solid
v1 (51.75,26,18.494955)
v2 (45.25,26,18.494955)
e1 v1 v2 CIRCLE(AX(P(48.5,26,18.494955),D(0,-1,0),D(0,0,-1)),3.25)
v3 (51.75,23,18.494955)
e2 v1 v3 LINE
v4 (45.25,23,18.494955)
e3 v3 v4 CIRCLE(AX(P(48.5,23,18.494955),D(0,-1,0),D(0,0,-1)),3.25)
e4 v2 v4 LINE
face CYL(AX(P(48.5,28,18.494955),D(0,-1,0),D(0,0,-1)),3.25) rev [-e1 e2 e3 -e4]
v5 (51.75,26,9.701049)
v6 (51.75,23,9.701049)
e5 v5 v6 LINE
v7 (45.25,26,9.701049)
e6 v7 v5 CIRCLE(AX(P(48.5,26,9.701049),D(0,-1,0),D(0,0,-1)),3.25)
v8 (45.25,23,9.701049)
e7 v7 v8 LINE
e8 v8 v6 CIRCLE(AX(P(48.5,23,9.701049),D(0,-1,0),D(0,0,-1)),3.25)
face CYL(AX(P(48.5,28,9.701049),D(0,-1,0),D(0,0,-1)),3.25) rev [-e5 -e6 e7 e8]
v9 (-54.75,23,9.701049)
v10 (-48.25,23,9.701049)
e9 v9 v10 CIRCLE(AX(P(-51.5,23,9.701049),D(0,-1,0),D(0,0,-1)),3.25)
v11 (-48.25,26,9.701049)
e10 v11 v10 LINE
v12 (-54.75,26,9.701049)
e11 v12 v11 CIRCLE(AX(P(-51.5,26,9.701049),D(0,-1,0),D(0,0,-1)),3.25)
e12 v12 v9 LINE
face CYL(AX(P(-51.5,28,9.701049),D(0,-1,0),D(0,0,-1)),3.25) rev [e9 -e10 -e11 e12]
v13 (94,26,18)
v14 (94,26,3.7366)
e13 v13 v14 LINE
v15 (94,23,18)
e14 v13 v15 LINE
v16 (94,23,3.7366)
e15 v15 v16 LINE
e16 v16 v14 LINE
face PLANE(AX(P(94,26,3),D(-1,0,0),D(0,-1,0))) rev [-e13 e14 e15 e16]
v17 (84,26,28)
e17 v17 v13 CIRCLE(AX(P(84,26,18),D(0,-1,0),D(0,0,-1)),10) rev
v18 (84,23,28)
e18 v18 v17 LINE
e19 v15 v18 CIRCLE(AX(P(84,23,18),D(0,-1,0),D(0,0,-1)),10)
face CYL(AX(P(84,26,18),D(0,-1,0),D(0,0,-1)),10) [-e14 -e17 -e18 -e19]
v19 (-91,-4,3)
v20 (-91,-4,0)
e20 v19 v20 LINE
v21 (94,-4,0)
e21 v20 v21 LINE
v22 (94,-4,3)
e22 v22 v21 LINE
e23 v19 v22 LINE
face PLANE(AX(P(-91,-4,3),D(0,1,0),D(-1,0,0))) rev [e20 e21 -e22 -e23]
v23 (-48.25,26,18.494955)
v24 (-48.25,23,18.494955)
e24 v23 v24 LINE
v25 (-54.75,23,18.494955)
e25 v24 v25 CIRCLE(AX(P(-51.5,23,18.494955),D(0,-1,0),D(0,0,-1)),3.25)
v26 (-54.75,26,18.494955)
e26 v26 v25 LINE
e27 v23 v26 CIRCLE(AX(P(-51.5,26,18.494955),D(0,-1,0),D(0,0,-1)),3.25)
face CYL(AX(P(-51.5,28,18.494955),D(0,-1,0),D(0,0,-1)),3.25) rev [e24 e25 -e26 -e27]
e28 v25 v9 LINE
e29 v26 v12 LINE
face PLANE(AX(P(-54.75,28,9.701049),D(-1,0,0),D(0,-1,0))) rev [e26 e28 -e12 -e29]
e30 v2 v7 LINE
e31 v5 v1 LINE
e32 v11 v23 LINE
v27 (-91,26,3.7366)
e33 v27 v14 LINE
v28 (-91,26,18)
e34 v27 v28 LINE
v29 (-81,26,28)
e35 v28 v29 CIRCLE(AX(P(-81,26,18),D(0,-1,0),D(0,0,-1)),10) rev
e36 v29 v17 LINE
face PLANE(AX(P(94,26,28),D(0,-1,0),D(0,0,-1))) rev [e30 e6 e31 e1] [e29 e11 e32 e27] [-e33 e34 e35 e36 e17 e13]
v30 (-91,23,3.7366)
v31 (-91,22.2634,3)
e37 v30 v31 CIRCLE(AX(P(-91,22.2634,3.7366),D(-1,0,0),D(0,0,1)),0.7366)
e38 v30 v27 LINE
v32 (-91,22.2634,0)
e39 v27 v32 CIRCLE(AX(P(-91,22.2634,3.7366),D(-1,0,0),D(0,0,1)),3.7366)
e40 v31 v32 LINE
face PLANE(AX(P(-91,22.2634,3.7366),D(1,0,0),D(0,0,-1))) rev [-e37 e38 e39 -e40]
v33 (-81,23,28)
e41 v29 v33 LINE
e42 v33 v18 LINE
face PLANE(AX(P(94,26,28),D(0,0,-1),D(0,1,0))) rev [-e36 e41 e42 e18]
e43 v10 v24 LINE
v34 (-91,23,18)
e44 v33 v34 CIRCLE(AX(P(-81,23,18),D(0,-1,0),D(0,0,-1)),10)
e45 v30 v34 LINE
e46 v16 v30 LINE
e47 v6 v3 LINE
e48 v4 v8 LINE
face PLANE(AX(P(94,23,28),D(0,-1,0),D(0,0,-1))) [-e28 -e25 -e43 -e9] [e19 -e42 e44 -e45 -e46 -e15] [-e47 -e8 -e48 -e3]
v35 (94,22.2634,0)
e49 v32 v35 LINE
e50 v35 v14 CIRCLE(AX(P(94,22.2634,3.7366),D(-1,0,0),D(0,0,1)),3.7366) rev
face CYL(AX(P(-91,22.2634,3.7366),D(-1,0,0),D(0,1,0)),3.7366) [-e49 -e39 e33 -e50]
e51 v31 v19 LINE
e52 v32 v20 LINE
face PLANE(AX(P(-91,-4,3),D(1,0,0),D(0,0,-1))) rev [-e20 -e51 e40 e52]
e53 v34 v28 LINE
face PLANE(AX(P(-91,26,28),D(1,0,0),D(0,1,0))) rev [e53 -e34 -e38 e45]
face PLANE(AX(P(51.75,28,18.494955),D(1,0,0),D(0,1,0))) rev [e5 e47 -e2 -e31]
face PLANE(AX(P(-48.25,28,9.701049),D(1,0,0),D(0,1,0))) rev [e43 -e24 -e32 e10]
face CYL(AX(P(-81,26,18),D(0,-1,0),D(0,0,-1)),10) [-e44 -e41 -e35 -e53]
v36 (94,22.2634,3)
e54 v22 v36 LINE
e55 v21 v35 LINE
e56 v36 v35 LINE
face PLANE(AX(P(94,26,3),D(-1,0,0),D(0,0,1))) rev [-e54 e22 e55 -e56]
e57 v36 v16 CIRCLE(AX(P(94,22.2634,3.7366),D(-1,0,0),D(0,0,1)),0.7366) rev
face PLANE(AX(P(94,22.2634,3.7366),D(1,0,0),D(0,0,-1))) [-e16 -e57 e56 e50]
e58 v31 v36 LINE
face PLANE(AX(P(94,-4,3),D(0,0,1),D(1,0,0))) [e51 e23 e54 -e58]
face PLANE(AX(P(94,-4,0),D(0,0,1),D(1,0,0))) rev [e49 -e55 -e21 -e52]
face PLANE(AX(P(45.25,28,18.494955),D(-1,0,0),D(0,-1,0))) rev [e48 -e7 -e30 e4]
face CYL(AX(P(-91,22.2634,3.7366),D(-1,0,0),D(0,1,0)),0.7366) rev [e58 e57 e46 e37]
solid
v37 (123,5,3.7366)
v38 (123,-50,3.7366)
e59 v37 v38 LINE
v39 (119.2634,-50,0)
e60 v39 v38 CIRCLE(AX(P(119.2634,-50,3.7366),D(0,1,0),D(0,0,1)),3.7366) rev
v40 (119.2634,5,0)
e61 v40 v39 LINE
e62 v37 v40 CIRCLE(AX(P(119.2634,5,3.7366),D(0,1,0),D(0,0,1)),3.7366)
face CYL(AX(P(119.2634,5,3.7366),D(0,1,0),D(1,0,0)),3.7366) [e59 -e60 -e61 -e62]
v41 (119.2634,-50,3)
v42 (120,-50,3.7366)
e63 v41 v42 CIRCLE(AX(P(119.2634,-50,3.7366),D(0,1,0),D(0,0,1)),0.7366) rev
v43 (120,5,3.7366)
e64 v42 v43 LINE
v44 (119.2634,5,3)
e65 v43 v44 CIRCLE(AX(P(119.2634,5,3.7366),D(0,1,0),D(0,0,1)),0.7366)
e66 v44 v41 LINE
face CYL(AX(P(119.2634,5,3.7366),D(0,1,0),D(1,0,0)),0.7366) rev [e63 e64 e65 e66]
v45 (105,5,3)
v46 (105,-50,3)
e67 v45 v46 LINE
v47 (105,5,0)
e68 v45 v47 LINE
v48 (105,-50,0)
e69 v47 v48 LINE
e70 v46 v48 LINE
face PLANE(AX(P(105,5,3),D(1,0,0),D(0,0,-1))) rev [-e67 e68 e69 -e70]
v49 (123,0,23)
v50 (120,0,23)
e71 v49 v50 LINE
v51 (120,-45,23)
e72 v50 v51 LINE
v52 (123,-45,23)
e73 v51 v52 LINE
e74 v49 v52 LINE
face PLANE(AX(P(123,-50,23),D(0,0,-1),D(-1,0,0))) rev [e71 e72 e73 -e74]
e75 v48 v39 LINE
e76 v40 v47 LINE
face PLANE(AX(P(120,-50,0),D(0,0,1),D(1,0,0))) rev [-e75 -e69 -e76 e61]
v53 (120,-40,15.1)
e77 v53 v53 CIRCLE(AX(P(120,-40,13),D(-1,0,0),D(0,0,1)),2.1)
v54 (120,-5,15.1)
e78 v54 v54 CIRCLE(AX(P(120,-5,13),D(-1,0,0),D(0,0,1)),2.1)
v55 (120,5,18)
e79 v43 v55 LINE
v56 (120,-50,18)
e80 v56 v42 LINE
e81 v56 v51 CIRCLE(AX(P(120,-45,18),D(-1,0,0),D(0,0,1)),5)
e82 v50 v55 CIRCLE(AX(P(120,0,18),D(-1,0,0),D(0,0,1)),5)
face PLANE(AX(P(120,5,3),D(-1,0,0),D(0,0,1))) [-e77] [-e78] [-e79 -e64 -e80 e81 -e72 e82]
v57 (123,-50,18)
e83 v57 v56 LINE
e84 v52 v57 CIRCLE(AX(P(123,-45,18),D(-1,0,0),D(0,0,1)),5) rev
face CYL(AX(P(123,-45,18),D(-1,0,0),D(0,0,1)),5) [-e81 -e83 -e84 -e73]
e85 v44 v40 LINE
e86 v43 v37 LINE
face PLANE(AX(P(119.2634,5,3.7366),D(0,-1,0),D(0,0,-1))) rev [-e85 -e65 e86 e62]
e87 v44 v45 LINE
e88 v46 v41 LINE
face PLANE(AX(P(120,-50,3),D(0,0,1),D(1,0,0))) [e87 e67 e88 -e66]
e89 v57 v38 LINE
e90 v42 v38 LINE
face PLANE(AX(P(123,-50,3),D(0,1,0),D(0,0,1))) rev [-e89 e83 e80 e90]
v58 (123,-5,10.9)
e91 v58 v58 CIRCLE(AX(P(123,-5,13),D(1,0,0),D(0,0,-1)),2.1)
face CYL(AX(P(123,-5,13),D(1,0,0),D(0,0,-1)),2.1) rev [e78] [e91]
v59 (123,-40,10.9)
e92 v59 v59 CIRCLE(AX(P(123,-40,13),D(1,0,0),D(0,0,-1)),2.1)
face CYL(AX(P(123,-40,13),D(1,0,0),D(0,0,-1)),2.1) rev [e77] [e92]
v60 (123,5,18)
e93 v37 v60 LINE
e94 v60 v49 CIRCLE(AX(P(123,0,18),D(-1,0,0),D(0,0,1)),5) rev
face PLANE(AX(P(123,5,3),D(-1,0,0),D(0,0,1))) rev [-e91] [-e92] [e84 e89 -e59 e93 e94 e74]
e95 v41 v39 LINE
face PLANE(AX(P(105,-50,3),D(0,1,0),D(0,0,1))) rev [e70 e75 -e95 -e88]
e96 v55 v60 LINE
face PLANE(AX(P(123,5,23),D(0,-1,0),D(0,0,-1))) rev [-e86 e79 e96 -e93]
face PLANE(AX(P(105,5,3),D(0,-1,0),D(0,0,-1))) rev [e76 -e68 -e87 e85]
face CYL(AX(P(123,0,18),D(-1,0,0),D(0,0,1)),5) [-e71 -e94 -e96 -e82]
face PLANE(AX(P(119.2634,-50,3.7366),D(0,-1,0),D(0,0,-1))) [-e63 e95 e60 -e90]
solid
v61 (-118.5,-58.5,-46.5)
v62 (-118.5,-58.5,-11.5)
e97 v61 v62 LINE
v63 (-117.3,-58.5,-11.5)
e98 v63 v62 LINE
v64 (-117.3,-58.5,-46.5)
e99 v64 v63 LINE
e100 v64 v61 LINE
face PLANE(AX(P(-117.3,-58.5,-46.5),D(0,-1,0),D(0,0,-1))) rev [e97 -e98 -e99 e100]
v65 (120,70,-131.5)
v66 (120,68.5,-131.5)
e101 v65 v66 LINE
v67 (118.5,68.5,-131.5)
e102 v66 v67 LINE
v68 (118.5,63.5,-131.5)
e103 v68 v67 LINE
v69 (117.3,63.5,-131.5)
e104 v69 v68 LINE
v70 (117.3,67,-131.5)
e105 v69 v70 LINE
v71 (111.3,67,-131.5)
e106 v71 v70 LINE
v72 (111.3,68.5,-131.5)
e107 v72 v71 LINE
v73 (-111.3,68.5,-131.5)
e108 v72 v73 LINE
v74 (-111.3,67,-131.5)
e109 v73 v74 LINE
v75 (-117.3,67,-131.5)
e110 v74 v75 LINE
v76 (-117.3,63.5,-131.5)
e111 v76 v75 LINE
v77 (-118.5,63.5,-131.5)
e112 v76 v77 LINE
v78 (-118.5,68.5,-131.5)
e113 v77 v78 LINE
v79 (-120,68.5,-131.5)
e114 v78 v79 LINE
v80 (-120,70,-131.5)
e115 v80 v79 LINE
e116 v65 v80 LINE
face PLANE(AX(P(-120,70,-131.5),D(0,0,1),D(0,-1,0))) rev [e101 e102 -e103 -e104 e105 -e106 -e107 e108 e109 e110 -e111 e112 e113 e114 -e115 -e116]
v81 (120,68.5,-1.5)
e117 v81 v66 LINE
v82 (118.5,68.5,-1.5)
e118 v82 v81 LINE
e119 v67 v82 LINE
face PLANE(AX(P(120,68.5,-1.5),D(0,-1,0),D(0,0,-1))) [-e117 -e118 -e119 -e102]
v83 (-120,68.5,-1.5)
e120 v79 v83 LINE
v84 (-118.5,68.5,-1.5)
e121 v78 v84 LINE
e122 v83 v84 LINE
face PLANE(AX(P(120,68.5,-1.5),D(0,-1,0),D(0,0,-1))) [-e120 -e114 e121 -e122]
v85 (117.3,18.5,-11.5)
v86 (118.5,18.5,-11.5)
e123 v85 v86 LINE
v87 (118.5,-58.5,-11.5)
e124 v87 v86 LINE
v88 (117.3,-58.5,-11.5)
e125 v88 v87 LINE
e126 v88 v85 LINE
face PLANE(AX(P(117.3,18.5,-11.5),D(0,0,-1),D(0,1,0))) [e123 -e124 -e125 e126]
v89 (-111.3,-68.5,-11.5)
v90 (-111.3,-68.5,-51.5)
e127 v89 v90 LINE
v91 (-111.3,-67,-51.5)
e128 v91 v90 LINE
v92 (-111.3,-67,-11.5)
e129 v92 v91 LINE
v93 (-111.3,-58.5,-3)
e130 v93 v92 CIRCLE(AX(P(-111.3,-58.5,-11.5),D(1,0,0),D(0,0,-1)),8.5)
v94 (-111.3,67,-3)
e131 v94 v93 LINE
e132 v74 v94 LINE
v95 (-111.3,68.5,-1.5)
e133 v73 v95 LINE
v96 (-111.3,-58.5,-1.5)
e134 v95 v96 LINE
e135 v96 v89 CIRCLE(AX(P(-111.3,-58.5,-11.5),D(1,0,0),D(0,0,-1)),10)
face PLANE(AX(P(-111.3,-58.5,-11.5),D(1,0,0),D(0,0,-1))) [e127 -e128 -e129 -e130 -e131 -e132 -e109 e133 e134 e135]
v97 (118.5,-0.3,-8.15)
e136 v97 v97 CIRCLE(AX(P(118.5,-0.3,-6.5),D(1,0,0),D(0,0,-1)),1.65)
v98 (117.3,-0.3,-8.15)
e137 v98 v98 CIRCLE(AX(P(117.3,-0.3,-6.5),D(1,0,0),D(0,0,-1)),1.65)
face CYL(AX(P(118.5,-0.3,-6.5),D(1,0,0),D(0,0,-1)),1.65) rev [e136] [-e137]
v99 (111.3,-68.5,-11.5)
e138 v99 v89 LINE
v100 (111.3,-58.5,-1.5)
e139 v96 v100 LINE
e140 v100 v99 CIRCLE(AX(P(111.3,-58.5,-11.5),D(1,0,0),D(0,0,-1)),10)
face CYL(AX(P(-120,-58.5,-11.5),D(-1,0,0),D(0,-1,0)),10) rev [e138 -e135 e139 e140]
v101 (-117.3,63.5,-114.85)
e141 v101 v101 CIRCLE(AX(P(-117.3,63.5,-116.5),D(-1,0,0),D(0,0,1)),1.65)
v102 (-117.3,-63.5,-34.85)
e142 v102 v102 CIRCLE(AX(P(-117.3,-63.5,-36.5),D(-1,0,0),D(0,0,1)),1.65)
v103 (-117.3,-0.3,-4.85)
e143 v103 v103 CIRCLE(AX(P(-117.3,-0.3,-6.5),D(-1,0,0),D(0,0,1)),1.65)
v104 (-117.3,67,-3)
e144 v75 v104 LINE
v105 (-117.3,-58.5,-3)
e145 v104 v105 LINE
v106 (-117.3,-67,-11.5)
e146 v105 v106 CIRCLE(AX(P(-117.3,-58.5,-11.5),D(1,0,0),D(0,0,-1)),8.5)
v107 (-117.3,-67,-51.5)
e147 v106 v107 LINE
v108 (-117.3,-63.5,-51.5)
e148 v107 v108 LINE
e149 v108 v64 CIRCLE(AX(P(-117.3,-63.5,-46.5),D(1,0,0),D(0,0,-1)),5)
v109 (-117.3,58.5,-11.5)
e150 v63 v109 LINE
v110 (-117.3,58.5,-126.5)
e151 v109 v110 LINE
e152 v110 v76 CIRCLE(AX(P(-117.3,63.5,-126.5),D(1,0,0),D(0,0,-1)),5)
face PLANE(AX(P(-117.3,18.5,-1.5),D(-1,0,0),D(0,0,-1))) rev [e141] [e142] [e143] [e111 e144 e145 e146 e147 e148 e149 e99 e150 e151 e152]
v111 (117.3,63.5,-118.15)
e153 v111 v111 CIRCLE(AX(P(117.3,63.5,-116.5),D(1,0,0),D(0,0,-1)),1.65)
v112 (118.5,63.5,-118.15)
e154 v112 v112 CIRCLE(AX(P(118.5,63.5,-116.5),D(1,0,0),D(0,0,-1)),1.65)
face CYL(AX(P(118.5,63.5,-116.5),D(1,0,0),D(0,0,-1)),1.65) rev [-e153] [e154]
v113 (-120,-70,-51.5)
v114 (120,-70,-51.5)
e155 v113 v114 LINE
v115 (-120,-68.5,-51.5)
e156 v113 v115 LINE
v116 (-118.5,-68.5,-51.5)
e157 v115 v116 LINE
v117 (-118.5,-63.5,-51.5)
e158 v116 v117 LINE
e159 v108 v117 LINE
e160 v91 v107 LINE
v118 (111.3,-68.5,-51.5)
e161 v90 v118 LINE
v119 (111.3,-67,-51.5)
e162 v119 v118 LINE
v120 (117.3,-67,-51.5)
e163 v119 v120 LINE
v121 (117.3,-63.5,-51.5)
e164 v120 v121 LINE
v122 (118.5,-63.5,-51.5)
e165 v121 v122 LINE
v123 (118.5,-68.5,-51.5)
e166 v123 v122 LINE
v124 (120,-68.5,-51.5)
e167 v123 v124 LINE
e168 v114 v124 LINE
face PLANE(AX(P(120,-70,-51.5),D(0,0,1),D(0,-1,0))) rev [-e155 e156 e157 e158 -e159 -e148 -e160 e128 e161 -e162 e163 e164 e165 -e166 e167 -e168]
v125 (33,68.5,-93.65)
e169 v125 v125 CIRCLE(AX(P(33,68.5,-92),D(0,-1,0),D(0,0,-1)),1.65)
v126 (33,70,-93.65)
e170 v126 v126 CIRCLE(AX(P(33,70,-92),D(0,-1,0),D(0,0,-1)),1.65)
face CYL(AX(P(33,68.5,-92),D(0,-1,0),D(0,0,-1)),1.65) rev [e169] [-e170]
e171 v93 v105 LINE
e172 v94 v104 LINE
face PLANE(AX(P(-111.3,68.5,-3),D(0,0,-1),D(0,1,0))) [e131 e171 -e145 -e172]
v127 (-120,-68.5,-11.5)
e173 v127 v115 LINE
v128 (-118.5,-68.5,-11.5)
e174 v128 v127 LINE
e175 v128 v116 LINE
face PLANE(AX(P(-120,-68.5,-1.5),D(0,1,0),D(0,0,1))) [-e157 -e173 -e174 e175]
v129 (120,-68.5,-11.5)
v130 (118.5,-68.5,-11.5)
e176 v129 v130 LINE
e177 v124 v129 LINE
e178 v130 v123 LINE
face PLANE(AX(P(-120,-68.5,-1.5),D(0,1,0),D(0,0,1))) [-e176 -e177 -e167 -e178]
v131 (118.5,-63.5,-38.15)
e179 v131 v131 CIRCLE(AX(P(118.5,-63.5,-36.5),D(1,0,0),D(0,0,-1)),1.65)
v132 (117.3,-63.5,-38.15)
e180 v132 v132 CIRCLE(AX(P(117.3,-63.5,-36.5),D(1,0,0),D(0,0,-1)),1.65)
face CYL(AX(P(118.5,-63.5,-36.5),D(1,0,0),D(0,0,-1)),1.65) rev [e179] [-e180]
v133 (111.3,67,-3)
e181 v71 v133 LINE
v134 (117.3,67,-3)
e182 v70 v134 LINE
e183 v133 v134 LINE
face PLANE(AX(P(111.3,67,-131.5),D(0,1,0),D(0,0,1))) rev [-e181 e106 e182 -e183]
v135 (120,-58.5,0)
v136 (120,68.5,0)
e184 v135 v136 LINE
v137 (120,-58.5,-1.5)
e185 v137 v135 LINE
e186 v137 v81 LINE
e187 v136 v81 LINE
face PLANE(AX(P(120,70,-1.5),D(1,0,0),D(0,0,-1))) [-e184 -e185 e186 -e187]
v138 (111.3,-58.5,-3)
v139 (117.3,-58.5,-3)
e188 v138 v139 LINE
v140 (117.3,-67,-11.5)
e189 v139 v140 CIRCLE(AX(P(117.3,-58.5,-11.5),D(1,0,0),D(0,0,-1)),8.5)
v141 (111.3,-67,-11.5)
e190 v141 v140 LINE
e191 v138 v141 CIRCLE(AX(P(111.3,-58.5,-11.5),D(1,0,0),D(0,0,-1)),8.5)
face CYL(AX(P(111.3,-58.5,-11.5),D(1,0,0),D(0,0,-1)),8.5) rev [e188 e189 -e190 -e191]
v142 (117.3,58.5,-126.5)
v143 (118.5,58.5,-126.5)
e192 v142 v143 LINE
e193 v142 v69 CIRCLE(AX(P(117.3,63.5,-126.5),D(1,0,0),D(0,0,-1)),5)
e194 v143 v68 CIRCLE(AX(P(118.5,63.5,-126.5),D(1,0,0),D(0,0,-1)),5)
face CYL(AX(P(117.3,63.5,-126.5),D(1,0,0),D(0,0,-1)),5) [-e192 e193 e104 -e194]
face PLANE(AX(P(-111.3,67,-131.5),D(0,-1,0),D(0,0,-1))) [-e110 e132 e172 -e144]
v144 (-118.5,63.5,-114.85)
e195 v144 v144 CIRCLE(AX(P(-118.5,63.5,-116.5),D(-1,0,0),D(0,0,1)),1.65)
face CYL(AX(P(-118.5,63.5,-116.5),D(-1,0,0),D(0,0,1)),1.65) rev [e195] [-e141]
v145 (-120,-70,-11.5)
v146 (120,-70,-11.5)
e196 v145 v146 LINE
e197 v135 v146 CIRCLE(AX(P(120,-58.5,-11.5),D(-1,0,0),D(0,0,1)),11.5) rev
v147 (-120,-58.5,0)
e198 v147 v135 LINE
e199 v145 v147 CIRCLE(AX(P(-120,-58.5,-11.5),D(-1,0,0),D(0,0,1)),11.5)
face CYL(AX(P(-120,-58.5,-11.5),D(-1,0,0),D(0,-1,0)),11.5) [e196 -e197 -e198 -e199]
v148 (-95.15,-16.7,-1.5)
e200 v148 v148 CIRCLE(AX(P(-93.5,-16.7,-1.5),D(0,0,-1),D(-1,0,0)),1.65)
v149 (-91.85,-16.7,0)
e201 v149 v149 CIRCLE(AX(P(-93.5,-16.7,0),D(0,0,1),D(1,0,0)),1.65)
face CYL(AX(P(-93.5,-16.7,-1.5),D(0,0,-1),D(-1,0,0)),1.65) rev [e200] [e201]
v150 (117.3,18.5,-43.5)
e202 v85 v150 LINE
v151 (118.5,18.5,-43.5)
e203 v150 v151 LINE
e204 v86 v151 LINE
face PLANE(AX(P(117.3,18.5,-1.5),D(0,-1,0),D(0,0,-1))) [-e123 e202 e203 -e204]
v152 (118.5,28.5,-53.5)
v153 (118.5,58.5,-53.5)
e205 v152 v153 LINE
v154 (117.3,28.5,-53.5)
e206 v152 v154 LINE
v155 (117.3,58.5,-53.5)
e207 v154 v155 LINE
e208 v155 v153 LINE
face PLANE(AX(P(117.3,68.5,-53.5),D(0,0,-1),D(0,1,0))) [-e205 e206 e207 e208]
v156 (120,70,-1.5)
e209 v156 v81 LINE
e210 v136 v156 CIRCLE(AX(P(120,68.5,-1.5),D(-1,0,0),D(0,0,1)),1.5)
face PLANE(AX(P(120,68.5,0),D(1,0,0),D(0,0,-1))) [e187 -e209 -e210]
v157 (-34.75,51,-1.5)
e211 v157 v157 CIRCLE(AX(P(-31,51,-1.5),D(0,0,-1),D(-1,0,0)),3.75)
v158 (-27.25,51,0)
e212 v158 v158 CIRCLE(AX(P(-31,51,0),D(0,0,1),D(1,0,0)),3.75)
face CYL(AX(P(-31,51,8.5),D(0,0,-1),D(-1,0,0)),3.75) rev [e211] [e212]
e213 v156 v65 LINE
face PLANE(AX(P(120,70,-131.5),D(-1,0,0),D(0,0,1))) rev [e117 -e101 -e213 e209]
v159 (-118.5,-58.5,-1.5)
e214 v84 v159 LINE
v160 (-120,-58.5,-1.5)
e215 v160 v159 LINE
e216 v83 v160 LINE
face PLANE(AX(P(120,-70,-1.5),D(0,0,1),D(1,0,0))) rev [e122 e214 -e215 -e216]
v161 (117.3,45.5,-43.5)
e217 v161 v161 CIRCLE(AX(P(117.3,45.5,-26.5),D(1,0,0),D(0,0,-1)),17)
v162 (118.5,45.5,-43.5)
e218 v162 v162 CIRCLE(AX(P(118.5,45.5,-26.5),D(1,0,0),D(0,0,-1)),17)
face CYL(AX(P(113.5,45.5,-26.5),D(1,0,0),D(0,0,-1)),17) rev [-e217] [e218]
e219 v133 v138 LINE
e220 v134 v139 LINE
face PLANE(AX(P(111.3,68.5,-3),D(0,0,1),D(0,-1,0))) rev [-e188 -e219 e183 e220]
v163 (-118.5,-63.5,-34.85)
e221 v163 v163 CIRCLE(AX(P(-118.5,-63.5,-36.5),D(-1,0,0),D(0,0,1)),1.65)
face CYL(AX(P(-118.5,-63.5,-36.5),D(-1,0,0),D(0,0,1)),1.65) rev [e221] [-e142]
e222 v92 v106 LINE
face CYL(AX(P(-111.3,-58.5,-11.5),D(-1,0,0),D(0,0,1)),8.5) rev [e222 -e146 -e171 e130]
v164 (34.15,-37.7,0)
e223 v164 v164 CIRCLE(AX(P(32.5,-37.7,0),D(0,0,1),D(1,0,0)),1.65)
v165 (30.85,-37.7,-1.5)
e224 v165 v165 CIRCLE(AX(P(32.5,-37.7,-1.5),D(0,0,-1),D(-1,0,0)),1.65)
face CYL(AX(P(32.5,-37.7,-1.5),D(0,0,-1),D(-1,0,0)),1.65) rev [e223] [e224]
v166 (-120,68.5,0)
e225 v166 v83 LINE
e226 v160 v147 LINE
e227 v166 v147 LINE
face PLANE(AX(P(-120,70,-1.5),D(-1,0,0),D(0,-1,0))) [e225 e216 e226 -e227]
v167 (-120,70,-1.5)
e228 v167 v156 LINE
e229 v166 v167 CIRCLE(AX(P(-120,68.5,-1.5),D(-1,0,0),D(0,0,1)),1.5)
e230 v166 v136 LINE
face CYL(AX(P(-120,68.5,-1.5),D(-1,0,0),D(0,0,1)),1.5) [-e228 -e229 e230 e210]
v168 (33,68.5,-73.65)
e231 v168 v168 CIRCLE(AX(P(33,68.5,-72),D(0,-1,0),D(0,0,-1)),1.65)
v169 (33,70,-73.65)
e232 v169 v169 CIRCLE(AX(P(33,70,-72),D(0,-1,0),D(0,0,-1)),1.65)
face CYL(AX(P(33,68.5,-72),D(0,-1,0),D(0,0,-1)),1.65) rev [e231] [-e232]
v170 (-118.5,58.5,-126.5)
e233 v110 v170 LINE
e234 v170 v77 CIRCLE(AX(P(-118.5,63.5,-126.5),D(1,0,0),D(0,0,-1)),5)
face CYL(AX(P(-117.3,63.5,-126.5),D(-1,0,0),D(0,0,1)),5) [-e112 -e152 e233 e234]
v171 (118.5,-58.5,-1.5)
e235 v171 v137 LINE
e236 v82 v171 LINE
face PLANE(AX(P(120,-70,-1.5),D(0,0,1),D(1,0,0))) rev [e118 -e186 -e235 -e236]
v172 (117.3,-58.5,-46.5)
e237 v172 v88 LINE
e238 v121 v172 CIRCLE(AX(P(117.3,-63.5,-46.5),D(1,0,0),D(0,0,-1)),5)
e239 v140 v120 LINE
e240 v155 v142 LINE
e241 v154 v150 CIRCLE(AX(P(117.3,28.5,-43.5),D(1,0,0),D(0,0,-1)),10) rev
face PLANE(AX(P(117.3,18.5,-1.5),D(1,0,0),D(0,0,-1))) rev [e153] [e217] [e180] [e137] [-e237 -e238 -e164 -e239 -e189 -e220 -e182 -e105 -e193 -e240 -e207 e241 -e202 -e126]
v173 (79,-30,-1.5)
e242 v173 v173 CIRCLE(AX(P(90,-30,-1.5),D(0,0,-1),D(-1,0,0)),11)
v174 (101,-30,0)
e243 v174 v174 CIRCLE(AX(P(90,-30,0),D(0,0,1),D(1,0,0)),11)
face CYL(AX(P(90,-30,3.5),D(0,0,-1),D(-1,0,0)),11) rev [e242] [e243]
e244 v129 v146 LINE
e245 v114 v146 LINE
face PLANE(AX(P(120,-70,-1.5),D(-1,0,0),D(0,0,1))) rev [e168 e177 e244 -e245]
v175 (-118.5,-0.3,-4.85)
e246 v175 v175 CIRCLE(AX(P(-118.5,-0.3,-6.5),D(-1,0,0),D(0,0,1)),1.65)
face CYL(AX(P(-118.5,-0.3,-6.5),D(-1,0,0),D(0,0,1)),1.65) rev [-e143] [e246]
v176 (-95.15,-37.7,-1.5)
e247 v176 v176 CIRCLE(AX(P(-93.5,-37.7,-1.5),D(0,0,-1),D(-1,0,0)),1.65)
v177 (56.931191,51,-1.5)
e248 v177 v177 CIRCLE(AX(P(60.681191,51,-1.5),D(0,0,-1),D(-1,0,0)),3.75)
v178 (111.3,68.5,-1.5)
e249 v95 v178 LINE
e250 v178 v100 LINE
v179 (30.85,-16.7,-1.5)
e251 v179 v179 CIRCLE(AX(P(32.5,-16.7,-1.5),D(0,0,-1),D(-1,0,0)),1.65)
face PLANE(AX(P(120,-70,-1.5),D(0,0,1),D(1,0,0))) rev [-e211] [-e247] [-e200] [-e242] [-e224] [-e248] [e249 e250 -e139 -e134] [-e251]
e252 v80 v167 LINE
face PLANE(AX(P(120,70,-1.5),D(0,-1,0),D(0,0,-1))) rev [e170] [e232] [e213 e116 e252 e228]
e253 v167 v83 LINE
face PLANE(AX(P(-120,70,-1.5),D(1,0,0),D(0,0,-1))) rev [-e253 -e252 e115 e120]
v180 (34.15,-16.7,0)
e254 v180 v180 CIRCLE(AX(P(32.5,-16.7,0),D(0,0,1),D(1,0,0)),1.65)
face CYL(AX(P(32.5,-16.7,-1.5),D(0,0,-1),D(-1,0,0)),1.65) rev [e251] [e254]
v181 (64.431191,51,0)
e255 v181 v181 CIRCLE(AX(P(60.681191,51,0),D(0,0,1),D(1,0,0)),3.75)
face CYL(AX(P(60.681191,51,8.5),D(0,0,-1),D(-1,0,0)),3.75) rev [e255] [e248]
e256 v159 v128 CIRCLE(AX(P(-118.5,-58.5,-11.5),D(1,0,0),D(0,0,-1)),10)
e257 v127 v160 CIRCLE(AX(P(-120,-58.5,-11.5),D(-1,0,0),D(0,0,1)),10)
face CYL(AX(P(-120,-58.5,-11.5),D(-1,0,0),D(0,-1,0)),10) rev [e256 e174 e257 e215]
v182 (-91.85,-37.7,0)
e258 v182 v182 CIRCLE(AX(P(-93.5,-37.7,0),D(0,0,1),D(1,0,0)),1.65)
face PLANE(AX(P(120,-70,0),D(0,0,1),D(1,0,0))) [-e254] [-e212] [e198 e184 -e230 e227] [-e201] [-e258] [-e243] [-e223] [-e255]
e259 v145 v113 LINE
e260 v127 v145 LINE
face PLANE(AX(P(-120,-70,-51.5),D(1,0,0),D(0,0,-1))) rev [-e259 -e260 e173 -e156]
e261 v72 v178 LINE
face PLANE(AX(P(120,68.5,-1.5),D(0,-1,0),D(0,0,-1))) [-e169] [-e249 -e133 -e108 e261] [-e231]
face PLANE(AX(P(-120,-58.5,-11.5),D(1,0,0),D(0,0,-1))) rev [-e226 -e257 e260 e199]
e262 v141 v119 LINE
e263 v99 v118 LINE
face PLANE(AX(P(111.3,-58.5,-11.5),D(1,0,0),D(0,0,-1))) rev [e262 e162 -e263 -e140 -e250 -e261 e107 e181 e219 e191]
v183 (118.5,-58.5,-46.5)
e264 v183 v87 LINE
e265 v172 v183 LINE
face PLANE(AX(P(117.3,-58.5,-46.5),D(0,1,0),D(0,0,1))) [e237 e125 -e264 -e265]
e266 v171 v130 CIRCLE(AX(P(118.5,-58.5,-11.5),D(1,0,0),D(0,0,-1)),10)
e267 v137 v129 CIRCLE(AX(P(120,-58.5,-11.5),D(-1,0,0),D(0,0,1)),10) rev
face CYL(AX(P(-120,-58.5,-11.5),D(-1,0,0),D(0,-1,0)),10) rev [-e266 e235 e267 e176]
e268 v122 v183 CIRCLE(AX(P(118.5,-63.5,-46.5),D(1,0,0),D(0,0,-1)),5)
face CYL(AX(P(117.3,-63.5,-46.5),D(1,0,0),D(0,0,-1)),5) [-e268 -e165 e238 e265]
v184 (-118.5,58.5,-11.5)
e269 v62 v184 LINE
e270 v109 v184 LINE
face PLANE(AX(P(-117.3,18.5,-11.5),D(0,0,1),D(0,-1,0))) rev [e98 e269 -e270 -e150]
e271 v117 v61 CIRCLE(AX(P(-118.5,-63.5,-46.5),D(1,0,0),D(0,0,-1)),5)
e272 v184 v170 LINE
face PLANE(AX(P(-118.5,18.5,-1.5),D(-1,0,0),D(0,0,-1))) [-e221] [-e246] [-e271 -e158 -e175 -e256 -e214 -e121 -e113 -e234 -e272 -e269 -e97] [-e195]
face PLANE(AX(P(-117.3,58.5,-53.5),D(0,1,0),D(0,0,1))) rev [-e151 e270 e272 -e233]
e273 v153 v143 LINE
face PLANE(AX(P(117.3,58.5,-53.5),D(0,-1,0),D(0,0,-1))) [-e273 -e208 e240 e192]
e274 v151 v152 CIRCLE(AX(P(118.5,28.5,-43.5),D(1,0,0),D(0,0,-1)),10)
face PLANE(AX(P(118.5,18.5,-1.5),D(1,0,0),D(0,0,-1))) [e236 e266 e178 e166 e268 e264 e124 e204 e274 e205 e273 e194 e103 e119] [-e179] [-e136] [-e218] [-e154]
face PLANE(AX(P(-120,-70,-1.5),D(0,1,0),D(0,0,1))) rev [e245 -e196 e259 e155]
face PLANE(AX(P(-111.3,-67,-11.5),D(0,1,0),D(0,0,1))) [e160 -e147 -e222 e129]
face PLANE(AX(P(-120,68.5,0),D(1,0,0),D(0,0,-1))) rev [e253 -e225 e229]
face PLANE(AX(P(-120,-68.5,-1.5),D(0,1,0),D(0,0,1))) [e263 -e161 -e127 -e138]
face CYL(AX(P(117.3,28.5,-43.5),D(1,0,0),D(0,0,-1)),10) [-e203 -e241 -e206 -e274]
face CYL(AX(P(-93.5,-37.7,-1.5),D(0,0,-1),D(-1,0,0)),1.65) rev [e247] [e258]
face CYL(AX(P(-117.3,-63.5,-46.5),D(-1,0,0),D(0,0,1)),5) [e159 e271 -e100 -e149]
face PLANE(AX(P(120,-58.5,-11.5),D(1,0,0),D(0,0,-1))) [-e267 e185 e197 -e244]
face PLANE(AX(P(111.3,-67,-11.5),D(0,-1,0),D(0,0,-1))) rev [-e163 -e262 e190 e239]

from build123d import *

# Parameters (mm, degrees)
SKETCH_1_W                       = 240
SKETCH_1_H                       = 140
SM_BASE_FLANGE_1_DEPTH           = 1.5
SM_START                         = -120
SM_EDGE_FLANGE_1_DEPTH           = 240
SM_EDGE_FLANGE_1_2_OUTLINE_W     = 1.5
SM_EDGE_FLANGE_1_2_OUTLINE_H     = 130
SM_EDGE_FLANGE_1_2_DEPTH         = 240
SM_EDGE_FLANGE_2_STRIP_W         = 26
SM_EDGE_FLANGE_2_STRIP_H         = 1.5
SM_EDGE_FLANGE_2_STRIP_CUT_DEPTH = 240
SM_EDGE_FLANGE_2_DEPTH           = 240
EXTRUDE_START                    = -1.5
SKETCH_10_W                      = 52
SKETCH_10_H                      = 50
EXTRUDE_1_DEPTH                  = 1.2
SKETCH_11_R                      = 17
CUT_EXTRUDE_7_DEPTH              = 5
SKETCH_12_R                      = 11
CUT_EXTRUDE_8_DEPTH              = 5
EXTRUDE_2_DEPTH                  = 1.2
EXTRUDE_3_DEPTH                  = 1.2
SKETCH_16_W                      = 42
SKETCH_16_H                      = 40
CUT_EXTRUDE_9_DEPTH              = 1.2
HOLE_WIZARD_M4_1_AT_2_COUNT      = 2
HOLE_WIZARD_M4_1_AT_2_PITCH      = 127.163044946
HOLE_WIZARD_M4_1_AT_3_COUNT      = 2
HOLE_WIZARD_M4_1_AT_3_PITCH      = 150.096635539
SKETCH_19_W                      = 185
SKETCH_19_H                      = 30
SM_BASE_FLANGE_1_2_DEPTH         = 3
SM_EDGE_FLANGE_3_STRIP_W         = 13.4732
SM_EDGE_FLANGE_3_STRIP_H         = 3
SM_EDGE_FLANGE_3_STRIP_CUT_DEPTH = 185
SM_EDGE_FLANGE_3_DEPTH           = 185
FILLET_1_R                       = 10
CUT_EXTRUDE_10_DEPTH             = 5
SKETCH_25_R                      = 3.75
CUT_EXTRUDE_11_DEPTH             = 10
EXTRUDE_1_2_DEPTH                = 6
HOLE_WIZARD_M4_2_AT_2_COUNT      = 2
HOLE_WIZARD_M4_2_AT_2_PITCH      = 21
HOLE_WIZARD_M4_2_AT_3_COUNT      = 2
HOLE_WIZARD_M4_2_AT_3_PITCH      = 126
HOLE_WIZARD_M4_2_AT_4_COUNT      = 2
HOLE_WIZARD_M4_2_AT_4_PITCH      = 127.738013136
SKETCH_29_W                      = 15
SKETCH_29_H                      = 55
SM_BASE_FLANGE_2_DEPTH           = 3
SM_EDGE_FLANGE_4_STRIP_W         = 13.4732
SM_EDGE_FLANGE_4_STRIP_H         = 3
SM_EDGE_FLANGE_4_STRIP_CUT_DEPTH = 55
SM_EDGE_FLANGE_4_DEPTH           = 55
HOLE_WIZARD_M5_1_AT_2_COUNT      = 2
HOLE_WIZARD_M5_1_AT_2_PITCH      = 35
FILLET_2_R                       = 5
FILLET_3_R                       = 10
HOLE_WIZARD_M4_3_AT_2_COUNT      = 2
HOLE_WIZARD_M4_3_AT_2_PITCH      = 20


# Read off the part's stored shape, not the designer's step: 边线-法兰1, 拉伸-薄壁1
# Sheet-metal steps are written as plain solids
with BuildPart() as part:
    # Sketch 1 → Sm Base Flange 1 (new body)
    with BuildSketch(Plane.XY):
        Rectangle(SKETCH_1_W, SKETCH_1_H)
    extrude(amount=-SM_BASE_FLANGE_1_DEPTH)

    # 边线-法兰1 outline → 边线-法兰1 (cut)
    with BuildSketch(Plane.YZ.offset(SM_START)):
        with BuildLine():
            Line((70, 0), (68.5, 0))
            ThreePointArc((68.5, 0), (69.560660172, -0.439339828), (70, -1.5))
            Line((70, -1.5), (70, 0))
        make_face()
    extrude(amount=SM_EDGE_FLANGE_1_DEPTH, mode=Mode.SUBTRACT)

    # Sm Edge Flange 1 2 outline → Sm Edge Flange 1 2 (add)
    with BuildSketch(Plane.YZ.offset(SM_START)):
        with Locations((69.25, -66.5)):
            Rectangle(SM_EDGE_FLANGE_1_2_OUTLINE_W, SM_EDGE_FLANGE_1_2_OUTLINE_H)
    extrude(amount=SM_EDGE_FLANGE_1_2_DEPTH)

    # 边线-法兰2 strip (across the edge) → 边线-法兰2 strip cut (cut)
    with BuildSketch(Plane(origin=(120, -70, -1.5), x_dir=(0, 1, 0), z_dir=(-1, 0, 0))):
        with Locations((-1.5, -0.75)):
            Rectangle(SM_EDGE_FLANGE_2_STRIP_W, SM_EDGE_FLANGE_2_STRIP_H)
    extrude(amount=SM_EDGE_FLANGE_2_STRIP_CUT_DEPTH, mode=Mode.SUBTRACT)

    # 边线-法兰2 section (across the edge) → 边线-法兰2 (add)
    with BuildSketch(Plane(origin=(120, -70, -1.5), x_dir=(0, 1, 0), z_dir=(-1, 0, 0))):
        with BuildLine():
            Line((0, 10), (0, 50))
            Line((0, 50), (1.5, 50))
            Line((1.5, 50), (1.5, 10))
            ThreePointArc((1.5, 10), (4.428932188, 2.928932188), (11.5, 0))
            Line((11.5, 0), (11.5, -1.5))
            ThreePointArc((11.5, -1.5), (3.368272016, 1.868272016), (0, 10))
        make_face()
    extrude(amount=SM_EDGE_FLANGE_2_DEPTH)

    # 草图10 → Extrude 1 (add)
    with BuildSketch(Plane(origin=(120, 0, 0), x_dir=(0, 0, -1), z_dir=(1, 0, 0)).offset(EXTRUDE_START)):
        with Locations((27.5, 43.5)):
            Rectangle(SKETCH_10_W, SKETCH_10_H)
    extrude_1 = extrude(amount=-EXTRUDE_1_DEPTH)

    # 草图11 → 切除-拉伸7 (cut)
    with BuildSketch(Plane(origin=(118.5, 0, 0), x_dir=(0, 0, -1), z_dir=(1, 0, 0))):
        with Locations((26.5, 45.5)):
            Circle(SKETCH_11_R)
    extrude(amount=-CUT_EXTRUDE_7_DEPTH, mode=Mode.SUBTRACT)

    # 草图12 → 切除-拉伸8 (cut)
    with BuildSketch(Plane(origin=(0, 0, -1.5), x_dir=(-1, 0, 0), z_dir=(0, 0, -1))):
        with Locations((-90, -30)):
            Circle(SKETCH_12_R)
    extrude(amount=-CUT_EXTRUDE_8_DEPTH, mode=Mode.SUBTRACT)

    # 草图14 → 凸台-拉伸2 (add)
    with BuildSketch(Plane(origin=(120, 0, 0), x_dir=(0, 0, -1), z_dir=(1, 0, 0)).offset(EXTRUDE_START)):
        with BuildLine():
            Line((51.5, -68.5), (11.5, -68.5))
            ThreePointArc((11.5, -68.5), (4.428932188, -65.571067812), (1.5, -58.5))
            Line((1.5, -58.5), (1.5, 18.5))
            Line((1.5, 18.5), (11.5, 18.5))
            Line((11.5, 18.5), (11.5, -58.5))
            Line((11.5, -58.5), (46.5, -58.5))
            ThreePointArc((46.5, -58.5), (50.035533906, -59.964466094), (51.5, -63.5))
            Line((51.5, -63.5), (51.5, -68.5))
        make_face()
    extrude_2 = extrude(amount=-EXTRUDE_2_DEPTH)

    # 草图15 → 凸台-拉伸3 (add)
    with BuildSketch(Plane(origin=(120, 0, 0), x_dir=(0, 0, -1), z_dir=(1, 0, 0)).offset(EXTRUDE_START)):
        with BuildLine():
            Line((53.5, 68.5), (131.5, 68.5))
            Line((131.5, 68.5), (131.5, 63.5))
            ThreePointArc((131.5, 63.5), (130.035533906, 59.964466094), (126.5, 58.5))
            Line((126.5, 58.5), (53.5, 58.5))
            Line((53.5, 58.5), (53.5, 68.5))
        make_face()
    extrude_3 = extrude(amount=-EXTRUDE_3_DEPTH)

    # 镜向1: Extrude 1, 凸台-拉伸2, 凸台-拉伸3 across plane
    add(extrude_1.mirror(Plane(origin=(0, 0, 0), x_dir=(0, 0, 1), z_dir=(1, 0, 0))))
    add(extrude_2.mirror(Plane(origin=(0, 0, 0), x_dir=(0, 0, 1), z_dir=(1, 0, 0))))
    add(extrude_3.mirror(Plane(origin=(0, 0, 0), x_dir=(0, 0, 1), z_dir=(1, 0, 0))))

    # 草图16 → 切除-拉伸9 (cut)
    with BuildSketch(Plane.ZY.offset(118.5)):
        with Locations((-32.5, 38.5)):
            Rectangle(SKETCH_16_W, SKETCH_16_H)
    extrude(amount=-CUT_EXTRUDE_9_DEPTH, mode=Mode.SUBTRACT)

    # 草图17 → M4 螺纹孔1 (revolve, cut)
    with BuildSketch(Plane(origin=(-118.5, 63.5, -116.5), x_dir=(0, 0, 1), z_dir=(0, 1, 0))):
        Polygon((0, 0), (0, 11.091420021), (1.65, 10.1), (1.65, 0), align=None)
    hole_wizard_m4_1 = revolve(axis=Axis((-124.85, 63.5, -116.5), (1, 0, 0)), mode=Mode.SUBTRACT)

    # M4 螺纹孔1 at 2: M4 螺纹孔1 ×2
    with Locations(*[Vector(0, -0.5017180897718436, 0.8650311892618048) * (i * HOLE_WIZARD_M4_1_AT_2_PITCH) for i in range(1, HOLE_WIZARD_M4_1_AT_2_COUNT)]):
        add(hole_wizard_m4_1, mode=Mode.SUBTRACT)

    # M4 螺纹孔1 at 3: M4 螺纹孔1 ×2
    with Locations(*[Vector(0, -0.8461215639131389, 0.532989961520087) * (i * HOLE_WIZARD_M4_1_AT_3_PITCH) for i in range(1, HOLE_WIZARD_M4_1_AT_3_COUNT)]):
        add(hole_wizard_m4_1, mode=Mode.SUBTRACT)

    # 镜向2: M4 螺纹孔1 across plane
    add(hole_wizard_m4_1.mirror(Plane(origin=(0, 0, 0), x_dir=(0, 0, 1), z_dir=(1, 0, 0))), mode=Mode.SUBTRACT)

    # 镜向2 copy 1 sketch → 镜向2 copy 1 (revolve, cut)
    with BuildSketch(Plane(origin=(118.5, -0.3, -6.5), x_dir=(0, 0, 1), z_dir=(0, 1, 0))):
        Polygon((0, 0), (0, -11.091420021), (1.65, -10.1), (1.65, 0), align=None)
    revolve(axis=Axis((124.85, -0.3, -6.5), (1, 0, 0)), mode=Mode.SUBTRACT)

    # 镜向2 copy 2 sketch → 镜向2 copy 2 (revolve, cut)
    with BuildSketch(Plane(origin=(118.5, -63.5, -36.5), x_dir=(0, 0, 1), z_dir=(0, 1, 0))):
        Polygon((0, 0), (0, -11.091420021), (1.65, -10.1), (1.65, 0), align=None)
    revolve(axis=Axis((124.85, -63.5, -36.5), (1, 0, 0)), mode=Mode.SUBTRACT)

    # 草图25 → 切除-拉伸11 (cut)
    with BuildSketch(Plane(origin=(0, 0, -1.5), x_dir=(-1, 0, 0), z_dir=(0, 0, -1))):
        with Locations((-60.681190721, 51)):
            Circle(SKETCH_25_R)
        with Locations((31, 51)):
            Circle(SKETCH_25_R)
    extrude(amount=-CUT_EXTRUDE_11_DEPTH, mode=Mode.SUBTRACT)

    # Extrude 1 2 outline → Extrude 1 2 (add)
    with BuildSketch(Plane(origin=(-117.3, 0, 0), x_dir=(0, 0, -1), z_dir=(1, 0, 0))):
        with BuildLine():
            Line((51.5, -68.5), (51.5, -67))
            Line((51.5, -67), (11.5, -67))
            ThreePointArc((11.5, -67), (5.48959236, -64.51040764), (3, -58.5))
            Line((3, -58.5), (3, 67))
            Line((3, 67), (131.5, 67))
            Line((131.5, 67), (131.5, 68.5))
            Line((131.5, 68.5), (1.5, 68.5))
            Line((1.5, 68.5), (1.5, -58.5))
            ThreePointArc((1.5, -58.5), (4.428932188, -65.571067812), (11.5, -68.5))
            Line((11.5, -68.5), (51.5, -68.5))
        make_face()
    extrude_1_2 = extrude(amount=EXTRUDE_1_2_DEPTH)

    # 镜向3: Extrude 1 2 across plane
    add(extrude_1_2.mirror(Plane(origin=(0, 0, 0), x_dir=(0, 0, 1), z_dir=(1, 0, 0))))

    # 草图27 → M4 螺纹孔2 (revolve, cut)
    with BuildSketch(Plane(origin=(-93.5, -16.7, -1.5), x_dir=(0, 1, 0), z_dir=(1, 0, 0))):
        Polygon((0, 0), (0, 11.091420021), (1.65, 10.1), (1.65, 0), align=None)
    hole_wizard_m4_2 = revolve(axis=Axis((-93.5, -16.7, -7.85), (0, 0, 1)), mode=Mode.SUBTRACT)

    # M4 螺纹孔2 at 2: M4 螺纹孔2 ×2
    with Locations(*[(0, -i * HOLE_WIZARD_M4_2_AT_2_PITCH, 0) for i in range(1, HOLE_WIZARD_M4_2_AT_2_COUNT)]):
        add(hole_wizard_m4_2, mode=Mode.SUBTRACT)

    # M4 螺纹孔2 at 3: M4 螺纹孔2 ×2
    with Locations(*[(i * HOLE_WIZARD_M4_2_AT_3_PITCH, 0, 0) for i in range(1, HOLE_WIZARD_M4_2_AT_3_COUNT)]):
        add(hole_wizard_m4_2, mode=Mode.SUBTRACT)

    # M4 螺纹孔2 at 4: M4 螺纹孔2 ×2
    with Locations(*[Vector(0.9863939238321437, -0.16439898730535732, 0) * (i * HOLE_WIZARD_M4_2_AT_4_PITCH) for i in range(1, HOLE_WIZARD_M4_2_AT_4_COUNT)]):
        add(hole_wizard_m4_2, mode=Mode.SUBTRACT)

    # 圆角3
    fillet_3_edges = [part.edges().sort_by_distance(p)[0] for p in [
        (117.9, 18.5, -53.5),
    ]]
    fillet(fillet_3_edges, radius=FILLET_3_R)

    # 草图37 → M4 螺纹孔3 (revolve, cut)
    with BuildSketch(Plane(origin=(33, 68.5, -92), x_dir=(0, 0, -1), z_dir=(1, 0, 0))):
        Polygon((0, 0), (0, 11.091420021), (1.65, 10.1), (1.65, 0), align=None)
    hole_wizard_m4_3 = revolve(axis=Axis((33, 62.15, -92), (0, 1, 0)), mode=Mode.SUBTRACT)

    # M4 螺纹孔3 at 2: M4 螺纹孔3 ×2
    with Locations(*[(0, 0, i * HOLE_WIZARD_M4_3_AT_2_PITCH) for i in range(1, HOLE_WIZARD_M4_3_AT_2_COUNT)]):
        add(hole_wizard_m4_3, mode=Mode.SUBTRACT)


with BuildPart() as body_2:
    # 草图19 → Sm Base Flange 1 2 (new body)
    with BuildSketch(Plane.XY):
        with Locations((1.5, 11)):
            Rectangle(SKETCH_19_W, SKETCH_19_H)
    extrude(amount=SM_BASE_FLANGE_1_2_DEPTH)

    # 边线-法兰3 strip (across the edge) → 边线-法兰3 strip cut (cut)
    with BuildSketch(Plane(origin=(94, 26, 3), x_dir=(0, -1, 0), z_dir=(-1, 0, 0))):
        with Locations((-3, -1.5)):
            Rectangle(SM_EDGE_FLANGE_3_STRIP_W, SM_EDGE_FLANGE_3_STRIP_H)
    extrude(amount=SM_EDGE_FLANGE_3_STRIP_CUT_DEPTH, mode=Mode.SUBTRACT)

    # 边线-法兰3 section (across the edge) → 边线-法兰3 (add)
    with BuildSketch(Plane(origin=(94, 26, 3), x_dir=(0, -1, 0), z_dir=(-1, 0, 0))):
        with BuildLine():
            Line((0, 0.7366), (0, 25))
            Line((0, 25), (3, 25))
            Line((3, 25), (3, 0.7366))
            ThreePointArc((3, 0.7366), (3.215745145, 0.215745145), (3.7366, 0))
            Line((3.7366, 0), (3.7366, -3))
            ThreePointArc((3.7366, -3), (1.094424801, -1.905575199), (0, 0.7366))
        make_face()
    extrude(amount=SM_EDGE_FLANGE_3_DEPTH)

    # 圆角1
    fillet_1_edges = [body_2.edges().sort_by_distance(p)[0] for p in [
        (94, 24.5, 28),
        (-91, 24.5, 28),
    ]]
    fillet(fillet_1_edges, radius=FILLET_1_R)

    # 草图24 → 切除-拉伸10 (cut)
    with BuildSketch(Plane.XZ.offset(-23)):
        with BuildLine():
            Line((51.75, 18.49495535), (51.75, 9.701048726))
            ThreePointArc((51.75, 9.701048726), (48.5, 6.451048726), (45.25, 9.701048726))
            Line((45.25, 9.701048726), (45.25, 18.49495535))
            ThreePointArc((45.25, 18.49495535), (48.5, 21.74495535), (51.75, 18.49495535))
        make_face()
        with BuildLine():
            Line((-54.75, 9.701048726), (-54.75, 18.49495535))
            ThreePointArc((-54.75, 18.49495535), (-51.5, 21.74495535), (-48.25, 18.49495535))
            Line((-48.25, 18.49495535), (-48.25, 9.701048726))
            ThreePointArc((-48.25, 9.701048726), (-51.5, 6.451048726), (-54.75, 9.701048726))
        make_face()
    extrude(amount=-CUT_EXTRUDE_10_DEPTH, mode=Mode.SUBTRACT)


with BuildPart() as body_3:
    # 草图29 → 薄片2 (new body)
    with BuildSketch(Plane.XY):
        with Locations((112.5, -22.5)):
            Rectangle(SKETCH_29_W, SKETCH_29_H)
    extrude(amount=SM_BASE_FLANGE_2_DEPTH)

    # 边线-法兰4 strip (across the edge) → 边线-法兰4 strip cut (cut)
    with BuildSketch(Plane(origin=(120, -50, 3), x_dir=(-1, 0, 0), z_dir=(0, 1, 0))):
        with Locations((-6, -1.5)):
            Rectangle(SM_EDGE_FLANGE_4_STRIP_W, SM_EDGE_FLANGE_4_STRIP_H)
    extrude(amount=SM_EDGE_FLANGE_4_STRIP_CUT_DEPTH, mode=Mode.SUBTRACT)

    # 边线-法兰4 section (across the edge) → 边线-法兰4 (add)
    with BuildSketch(Plane(origin=(120, -50, 3), x_dir=(-1, 0, 0), z_dir=(0, 1, 0))):
        with BuildLine():
            Line((-3, 0.7366), (-3, 20))
            Line((-3, 20), (0, 20))
            Line((0, 20), (0, 0.7366))
            ThreePointArc((0, 0.7366), (0.215745145, 0.215745145), (0.7366, 0))
            Line((0.7366, 0), (0.7366, -3))
            ThreePointArc((0.7366, -3), (-1.905575199, -1.905575199), (-3, 0.7366))
        make_face()
    extrude(amount=SM_EDGE_FLANGE_4_DEPTH)

    # 草图35 → M5 螺纹孔1 (revolve, cut)
    with BuildSketch(Plane(origin=(123, -5, 13), x_dir=(0, 0, -1), z_dir=(0, 1, 0))):
        Polygon((0, 0), (0, 13.6618073), (2.1, 12.4), (2.1, 0), align=None)
    hole_wizard_m5_1 = revolve(axis=Axis((129.35, -5, 13), (-1, 0, 0)), mode=Mode.SUBTRACT)

    # M5 螺纹孔1 at 2: M5 螺纹孔1 ×2
    with Locations(*[(0, -i * HOLE_WIZARD_M5_1_AT_2_PITCH, 0) for i in range(1, HOLE_WIZARD_M5_1_AT_2_COUNT)]):
        add(hole_wizard_m5_1, mode=Mode.SUBTRACT)

    # 圆角2
    fillet_2_edges = [body_3.edges().sort_by_distance(p)[0] for p in [
        (121.5, -50, 23),
        (121.5, 5, 23),
    ]]
    fillet(fillet_2_edges, radius=FILLET_2_R)


solid = Compound([part.part, body_2.part, body_3.part])
